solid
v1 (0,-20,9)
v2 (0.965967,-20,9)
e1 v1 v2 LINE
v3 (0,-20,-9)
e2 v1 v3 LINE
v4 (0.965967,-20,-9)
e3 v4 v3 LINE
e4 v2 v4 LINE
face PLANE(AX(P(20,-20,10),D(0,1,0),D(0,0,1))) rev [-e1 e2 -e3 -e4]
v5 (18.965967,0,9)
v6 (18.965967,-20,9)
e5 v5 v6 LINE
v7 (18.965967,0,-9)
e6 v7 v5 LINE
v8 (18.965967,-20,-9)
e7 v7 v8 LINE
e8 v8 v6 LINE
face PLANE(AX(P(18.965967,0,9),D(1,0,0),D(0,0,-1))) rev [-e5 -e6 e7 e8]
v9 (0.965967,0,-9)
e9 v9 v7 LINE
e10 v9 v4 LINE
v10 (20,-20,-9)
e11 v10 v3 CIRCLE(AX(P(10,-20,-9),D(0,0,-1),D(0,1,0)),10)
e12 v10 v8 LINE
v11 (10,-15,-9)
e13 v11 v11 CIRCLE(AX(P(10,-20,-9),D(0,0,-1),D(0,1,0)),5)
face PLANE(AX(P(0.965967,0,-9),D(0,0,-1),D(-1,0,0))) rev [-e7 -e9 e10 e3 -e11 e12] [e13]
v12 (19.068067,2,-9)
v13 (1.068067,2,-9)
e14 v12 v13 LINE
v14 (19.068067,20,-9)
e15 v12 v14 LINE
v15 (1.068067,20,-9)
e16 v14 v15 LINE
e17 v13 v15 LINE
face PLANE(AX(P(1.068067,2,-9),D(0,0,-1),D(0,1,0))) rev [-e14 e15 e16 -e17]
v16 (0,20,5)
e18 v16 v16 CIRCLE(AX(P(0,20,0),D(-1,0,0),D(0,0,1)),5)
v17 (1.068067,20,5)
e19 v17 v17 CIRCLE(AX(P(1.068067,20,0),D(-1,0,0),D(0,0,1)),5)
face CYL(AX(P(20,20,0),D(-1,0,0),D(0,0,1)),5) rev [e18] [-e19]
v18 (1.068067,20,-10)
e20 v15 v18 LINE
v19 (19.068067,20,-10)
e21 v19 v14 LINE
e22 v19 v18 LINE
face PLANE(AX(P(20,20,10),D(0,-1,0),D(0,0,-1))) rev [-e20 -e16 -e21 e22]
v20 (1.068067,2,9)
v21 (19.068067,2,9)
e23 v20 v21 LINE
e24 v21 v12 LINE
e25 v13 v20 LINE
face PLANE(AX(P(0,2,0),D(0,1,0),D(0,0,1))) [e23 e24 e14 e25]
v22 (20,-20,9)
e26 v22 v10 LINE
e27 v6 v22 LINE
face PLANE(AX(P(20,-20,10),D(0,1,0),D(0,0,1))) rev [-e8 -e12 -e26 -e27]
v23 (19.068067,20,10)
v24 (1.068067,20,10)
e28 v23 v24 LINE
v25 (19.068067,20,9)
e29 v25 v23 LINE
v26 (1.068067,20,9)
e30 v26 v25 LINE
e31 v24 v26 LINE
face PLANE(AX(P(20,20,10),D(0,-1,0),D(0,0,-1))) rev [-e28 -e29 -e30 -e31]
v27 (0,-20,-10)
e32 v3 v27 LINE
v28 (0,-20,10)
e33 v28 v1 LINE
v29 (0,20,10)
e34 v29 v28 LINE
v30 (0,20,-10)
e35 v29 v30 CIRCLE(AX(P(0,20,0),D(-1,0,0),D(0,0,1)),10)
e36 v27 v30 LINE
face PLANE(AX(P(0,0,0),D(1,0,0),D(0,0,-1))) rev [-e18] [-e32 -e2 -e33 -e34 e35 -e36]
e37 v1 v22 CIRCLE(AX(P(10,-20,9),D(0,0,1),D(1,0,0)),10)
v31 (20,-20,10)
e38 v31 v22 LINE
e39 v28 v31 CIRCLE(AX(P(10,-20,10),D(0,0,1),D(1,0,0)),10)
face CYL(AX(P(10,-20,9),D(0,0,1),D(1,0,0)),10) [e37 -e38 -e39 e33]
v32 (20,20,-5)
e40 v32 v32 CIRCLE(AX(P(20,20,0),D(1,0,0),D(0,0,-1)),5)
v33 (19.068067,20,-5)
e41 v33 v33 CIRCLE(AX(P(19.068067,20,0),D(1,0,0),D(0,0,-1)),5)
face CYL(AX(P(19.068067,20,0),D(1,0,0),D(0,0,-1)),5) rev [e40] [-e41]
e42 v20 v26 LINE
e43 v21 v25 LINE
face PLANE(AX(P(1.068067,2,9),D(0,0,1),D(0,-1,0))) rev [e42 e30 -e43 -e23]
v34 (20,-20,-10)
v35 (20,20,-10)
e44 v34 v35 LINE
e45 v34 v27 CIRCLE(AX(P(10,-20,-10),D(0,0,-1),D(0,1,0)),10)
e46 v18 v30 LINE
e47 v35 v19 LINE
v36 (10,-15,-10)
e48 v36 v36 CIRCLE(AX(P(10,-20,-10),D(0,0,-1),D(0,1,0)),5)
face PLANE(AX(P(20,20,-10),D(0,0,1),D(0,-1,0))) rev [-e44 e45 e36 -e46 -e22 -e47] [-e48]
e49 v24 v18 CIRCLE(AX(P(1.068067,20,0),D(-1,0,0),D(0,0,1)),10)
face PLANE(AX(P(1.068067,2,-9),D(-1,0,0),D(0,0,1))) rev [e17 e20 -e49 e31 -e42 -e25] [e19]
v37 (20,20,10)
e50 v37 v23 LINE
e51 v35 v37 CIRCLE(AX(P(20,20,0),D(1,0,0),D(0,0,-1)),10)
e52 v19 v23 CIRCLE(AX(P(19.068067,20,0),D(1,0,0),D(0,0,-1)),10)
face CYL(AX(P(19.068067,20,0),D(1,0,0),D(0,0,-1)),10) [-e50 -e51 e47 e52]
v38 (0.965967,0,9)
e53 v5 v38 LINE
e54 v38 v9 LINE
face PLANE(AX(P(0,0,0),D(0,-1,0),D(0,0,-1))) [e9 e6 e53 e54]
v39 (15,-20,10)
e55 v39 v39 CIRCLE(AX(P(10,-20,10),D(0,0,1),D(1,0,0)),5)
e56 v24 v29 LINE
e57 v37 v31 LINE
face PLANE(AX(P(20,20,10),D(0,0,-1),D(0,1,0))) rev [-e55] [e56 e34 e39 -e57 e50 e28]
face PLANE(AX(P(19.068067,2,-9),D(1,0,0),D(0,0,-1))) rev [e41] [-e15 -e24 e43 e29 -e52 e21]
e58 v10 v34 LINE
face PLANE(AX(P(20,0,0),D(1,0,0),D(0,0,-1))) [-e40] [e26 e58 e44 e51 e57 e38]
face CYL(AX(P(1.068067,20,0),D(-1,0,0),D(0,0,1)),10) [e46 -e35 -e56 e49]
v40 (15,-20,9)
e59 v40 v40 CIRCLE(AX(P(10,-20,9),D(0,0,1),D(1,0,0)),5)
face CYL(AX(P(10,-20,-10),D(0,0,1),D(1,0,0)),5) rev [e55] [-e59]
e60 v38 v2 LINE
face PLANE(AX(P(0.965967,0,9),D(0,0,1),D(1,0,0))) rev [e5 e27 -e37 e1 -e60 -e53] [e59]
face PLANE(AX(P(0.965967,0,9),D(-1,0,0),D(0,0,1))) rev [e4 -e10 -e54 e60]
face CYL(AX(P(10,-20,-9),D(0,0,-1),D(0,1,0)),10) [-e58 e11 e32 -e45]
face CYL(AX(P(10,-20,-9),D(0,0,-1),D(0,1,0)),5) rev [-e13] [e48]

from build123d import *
from OCP.BRepAlgoAPI import BRepAlgoAPI_Cut
from OCP.TopTools import TopTools_ListOfShape

# Parameters (mm, degrees)
SKETCH1_W                = 20
SKETCH1_H                = 40
BOSS_EXTRUDE1_DEPTH      = 20
SKETCH3_W                = 18
SKETCH3_H                = 18
CUT_EXTRUDE1_DEPTH       = 20
BOSS_EXTRUDE2_START      = -1
BOSS_EXTRUDE2_DEPTH      = 1
BOSS_EXTRUDE3_START      = -1
SKETCH4_R                = 10
SKETCH4_R_2              = 5
BOSS_EXTRUDE3_DEPTH      = 1
SKETCH5_W                = 18
SKETCH5_H                = 18
CUT_EXTRUDE3_DEPTH       = 18
BOSS_EXTRUDE4_START      = -0.931933
SKETCH8_R                = 10
SKETCH8_R_2              = 5
BOSS_EXTRUDE4_DEPTH      = 0.931933
BOSS_EXTRUDE5_START      = -1.068067
BOSS_EXTRUDE5_DEPTH      = 1.068067
CUT_EXTRUDE4_OUTLINE_W   = 5
CUT_EXTRUDE4_OUTLINE_H   = 0.931933326
CUT_EXTRUDE4_OUTLINE_H_2 = 1.068066674
SKETCH12_R               = 5
CUT_EXTRUDE5_DEPTH       = 42.231056256


with BuildPart() as part:
    # Sketch1 → Boss-Extrude1 (new body)
    with BuildSketch(Plane(origin=(0, 0, 0), x_dir=(0, 0, -1), z_dir=(1, 0, 0))):
        Rectangle(SKETCH1_W, SKETCH1_H)
    extrude(amount=BOSS_EXTRUDE1_DEPTH)

    # Sketch3 → Cut-Extrude1 (cut)
    with BuildSketch(Plane.XZ.offset(20)):
        with Locations((9.965966663, 0)):
            Rectangle(SKETCH3_W, SKETCH3_H)
    extrude(amount=-CUT_EXTRUDE1_DEPTH, mode=Mode.SUBTRACT)

    # Sketch2 → Boss-Extrude2 (add)
    with BuildSketch(Plane.XY.offset(10).offset(BOSS_EXTRUDE2_START)):
        with BuildLine():
            ThreePointArc((0, -20), (10, -30), (20, -20))
            Line((20, -20), (0, -20))
        make_face()
    extrude(amount=BOSS_EXTRUDE2_DEPTH)

    # Sketch4 → Boss-Extrude3 (add)
    with BuildSketch(Plane(origin=(0, 0, -10), x_dir=(-1, 0, 0), z_dir=(0, 0, -1)).offset(BOSS_EXTRUDE3_START)):
        with Locations((-10, -20)):
            Circle(SKETCH4_R)
        with Locations((-10, -20)):
            Circle(SKETCH4_R_2, mode=Mode.SUBTRACT)
    extrude(amount=BOSS_EXTRUDE3_DEPTH)

    # Sketch5 → Cut-Extrude3 (cut)
    with BuildSketch(Plane(origin=(0, 20, 0), x_dir=(1, 0, 0), z_dir=(0, 1, 0))):
        with Locations((10.068066674, 0)):
            Rectangle(SKETCH5_W, SKETCH5_H)
    extrude(amount=-CUT_EXTRUDE3_DEPTH, mode=Mode.SUBTRACT)

    # Sketch8 → Boss-Extrude4 (add)
    with BuildSketch(Plane(origin=(20, 0, 0), x_dir=(0, 0, -1), z_dir=(1, 0, 0)).offset(BOSS_EXTRUDE4_START)):
        with Locations((0, 20)):
            Circle(SKETCH8_R)
        with Locations((0, 20)):
            Circle(SKETCH8_R_2, mode=Mode.SUBTRACT)
    extrude(amount=BOSS_EXTRUDE4_DEPTH)

    # Sketch7 → Boss-Extrude5 (add)
    with BuildSketch(Plane.ZY.offset(BOSS_EXTRUDE5_START)):
        with BuildLine():
            ThreePointArc((10, 20), (0, 30), (-10, 20))
            Line((-10, 20), (10, 20))
        make_face()
    extrude(amount=BOSS_EXTRUDE5_DEPTH)


with BuildPart() as cut_extrude4_tool:
    # Cut-Extrude4: read off the stored shape, not the designer's step
    # Cut-Extrude4 outline → Cut-Extrude4 (revolve)
    with BuildSketch(Plane(origin=(0, 20, 0), x_dir=(0, 1, 0), z_dir=(0, 0, -1))):
        with Locations((2.5, 19.534033337)):
            Rectangle(CUT_EXTRUDE4_OUTLINE_W, CUT_EXTRUDE4_OUTLINE_H)
        with Locations((2.5, 0.534033337)):
            Rectangle(CUT_EXTRUDE4_OUTLINE_W, CUT_EXTRUDE4_OUTLINE_H_2)
    revolve(axis=Axis((0, 20, 0), (1, 0, 0)))


with BuildPart() as part_1:
    add(part.part)

    # Cut-Extrude4: cut by cut_extrude4_tool, with a tolerance
    cut_extrude4_stock = TopTools_ListOfShape()
    cut_extrude4_stock.Append(part_1.part.wrapped)
    cut_extrude4_tools = TopTools_ListOfShape()
    cut_extrude4_tools.Append(cut_extrude4_tool.part.wrapped)
    cut_extrude4_cut = BRepAlgoAPI_Cut()
    cut_extrude4_cut.SetArguments(cut_extrude4_stock)
    cut_extrude4_cut.SetTools(cut_extrude4_tools)
    cut_extrude4_cut.SetFuzzyValue(0.00001)
    cut_extrude4_cut.Build()
    add(Compound.cast(cut_extrude4_cut.Shape()).solids(), mode=Mode.REPLACE)

    # Sketch12 → Cut-Extrude5 (cut, through all)
    with BuildSketch(Plane.XY.offset(10)):
        with Locations(Location((10, -20, 0), (0, 0, 90))):
            Circle(SKETCH12_R)
    extrude(amount=-CUT_EXTRUDE5_DEPTH, mode=Mode.SUBTRACT)


solid = part_1.part
